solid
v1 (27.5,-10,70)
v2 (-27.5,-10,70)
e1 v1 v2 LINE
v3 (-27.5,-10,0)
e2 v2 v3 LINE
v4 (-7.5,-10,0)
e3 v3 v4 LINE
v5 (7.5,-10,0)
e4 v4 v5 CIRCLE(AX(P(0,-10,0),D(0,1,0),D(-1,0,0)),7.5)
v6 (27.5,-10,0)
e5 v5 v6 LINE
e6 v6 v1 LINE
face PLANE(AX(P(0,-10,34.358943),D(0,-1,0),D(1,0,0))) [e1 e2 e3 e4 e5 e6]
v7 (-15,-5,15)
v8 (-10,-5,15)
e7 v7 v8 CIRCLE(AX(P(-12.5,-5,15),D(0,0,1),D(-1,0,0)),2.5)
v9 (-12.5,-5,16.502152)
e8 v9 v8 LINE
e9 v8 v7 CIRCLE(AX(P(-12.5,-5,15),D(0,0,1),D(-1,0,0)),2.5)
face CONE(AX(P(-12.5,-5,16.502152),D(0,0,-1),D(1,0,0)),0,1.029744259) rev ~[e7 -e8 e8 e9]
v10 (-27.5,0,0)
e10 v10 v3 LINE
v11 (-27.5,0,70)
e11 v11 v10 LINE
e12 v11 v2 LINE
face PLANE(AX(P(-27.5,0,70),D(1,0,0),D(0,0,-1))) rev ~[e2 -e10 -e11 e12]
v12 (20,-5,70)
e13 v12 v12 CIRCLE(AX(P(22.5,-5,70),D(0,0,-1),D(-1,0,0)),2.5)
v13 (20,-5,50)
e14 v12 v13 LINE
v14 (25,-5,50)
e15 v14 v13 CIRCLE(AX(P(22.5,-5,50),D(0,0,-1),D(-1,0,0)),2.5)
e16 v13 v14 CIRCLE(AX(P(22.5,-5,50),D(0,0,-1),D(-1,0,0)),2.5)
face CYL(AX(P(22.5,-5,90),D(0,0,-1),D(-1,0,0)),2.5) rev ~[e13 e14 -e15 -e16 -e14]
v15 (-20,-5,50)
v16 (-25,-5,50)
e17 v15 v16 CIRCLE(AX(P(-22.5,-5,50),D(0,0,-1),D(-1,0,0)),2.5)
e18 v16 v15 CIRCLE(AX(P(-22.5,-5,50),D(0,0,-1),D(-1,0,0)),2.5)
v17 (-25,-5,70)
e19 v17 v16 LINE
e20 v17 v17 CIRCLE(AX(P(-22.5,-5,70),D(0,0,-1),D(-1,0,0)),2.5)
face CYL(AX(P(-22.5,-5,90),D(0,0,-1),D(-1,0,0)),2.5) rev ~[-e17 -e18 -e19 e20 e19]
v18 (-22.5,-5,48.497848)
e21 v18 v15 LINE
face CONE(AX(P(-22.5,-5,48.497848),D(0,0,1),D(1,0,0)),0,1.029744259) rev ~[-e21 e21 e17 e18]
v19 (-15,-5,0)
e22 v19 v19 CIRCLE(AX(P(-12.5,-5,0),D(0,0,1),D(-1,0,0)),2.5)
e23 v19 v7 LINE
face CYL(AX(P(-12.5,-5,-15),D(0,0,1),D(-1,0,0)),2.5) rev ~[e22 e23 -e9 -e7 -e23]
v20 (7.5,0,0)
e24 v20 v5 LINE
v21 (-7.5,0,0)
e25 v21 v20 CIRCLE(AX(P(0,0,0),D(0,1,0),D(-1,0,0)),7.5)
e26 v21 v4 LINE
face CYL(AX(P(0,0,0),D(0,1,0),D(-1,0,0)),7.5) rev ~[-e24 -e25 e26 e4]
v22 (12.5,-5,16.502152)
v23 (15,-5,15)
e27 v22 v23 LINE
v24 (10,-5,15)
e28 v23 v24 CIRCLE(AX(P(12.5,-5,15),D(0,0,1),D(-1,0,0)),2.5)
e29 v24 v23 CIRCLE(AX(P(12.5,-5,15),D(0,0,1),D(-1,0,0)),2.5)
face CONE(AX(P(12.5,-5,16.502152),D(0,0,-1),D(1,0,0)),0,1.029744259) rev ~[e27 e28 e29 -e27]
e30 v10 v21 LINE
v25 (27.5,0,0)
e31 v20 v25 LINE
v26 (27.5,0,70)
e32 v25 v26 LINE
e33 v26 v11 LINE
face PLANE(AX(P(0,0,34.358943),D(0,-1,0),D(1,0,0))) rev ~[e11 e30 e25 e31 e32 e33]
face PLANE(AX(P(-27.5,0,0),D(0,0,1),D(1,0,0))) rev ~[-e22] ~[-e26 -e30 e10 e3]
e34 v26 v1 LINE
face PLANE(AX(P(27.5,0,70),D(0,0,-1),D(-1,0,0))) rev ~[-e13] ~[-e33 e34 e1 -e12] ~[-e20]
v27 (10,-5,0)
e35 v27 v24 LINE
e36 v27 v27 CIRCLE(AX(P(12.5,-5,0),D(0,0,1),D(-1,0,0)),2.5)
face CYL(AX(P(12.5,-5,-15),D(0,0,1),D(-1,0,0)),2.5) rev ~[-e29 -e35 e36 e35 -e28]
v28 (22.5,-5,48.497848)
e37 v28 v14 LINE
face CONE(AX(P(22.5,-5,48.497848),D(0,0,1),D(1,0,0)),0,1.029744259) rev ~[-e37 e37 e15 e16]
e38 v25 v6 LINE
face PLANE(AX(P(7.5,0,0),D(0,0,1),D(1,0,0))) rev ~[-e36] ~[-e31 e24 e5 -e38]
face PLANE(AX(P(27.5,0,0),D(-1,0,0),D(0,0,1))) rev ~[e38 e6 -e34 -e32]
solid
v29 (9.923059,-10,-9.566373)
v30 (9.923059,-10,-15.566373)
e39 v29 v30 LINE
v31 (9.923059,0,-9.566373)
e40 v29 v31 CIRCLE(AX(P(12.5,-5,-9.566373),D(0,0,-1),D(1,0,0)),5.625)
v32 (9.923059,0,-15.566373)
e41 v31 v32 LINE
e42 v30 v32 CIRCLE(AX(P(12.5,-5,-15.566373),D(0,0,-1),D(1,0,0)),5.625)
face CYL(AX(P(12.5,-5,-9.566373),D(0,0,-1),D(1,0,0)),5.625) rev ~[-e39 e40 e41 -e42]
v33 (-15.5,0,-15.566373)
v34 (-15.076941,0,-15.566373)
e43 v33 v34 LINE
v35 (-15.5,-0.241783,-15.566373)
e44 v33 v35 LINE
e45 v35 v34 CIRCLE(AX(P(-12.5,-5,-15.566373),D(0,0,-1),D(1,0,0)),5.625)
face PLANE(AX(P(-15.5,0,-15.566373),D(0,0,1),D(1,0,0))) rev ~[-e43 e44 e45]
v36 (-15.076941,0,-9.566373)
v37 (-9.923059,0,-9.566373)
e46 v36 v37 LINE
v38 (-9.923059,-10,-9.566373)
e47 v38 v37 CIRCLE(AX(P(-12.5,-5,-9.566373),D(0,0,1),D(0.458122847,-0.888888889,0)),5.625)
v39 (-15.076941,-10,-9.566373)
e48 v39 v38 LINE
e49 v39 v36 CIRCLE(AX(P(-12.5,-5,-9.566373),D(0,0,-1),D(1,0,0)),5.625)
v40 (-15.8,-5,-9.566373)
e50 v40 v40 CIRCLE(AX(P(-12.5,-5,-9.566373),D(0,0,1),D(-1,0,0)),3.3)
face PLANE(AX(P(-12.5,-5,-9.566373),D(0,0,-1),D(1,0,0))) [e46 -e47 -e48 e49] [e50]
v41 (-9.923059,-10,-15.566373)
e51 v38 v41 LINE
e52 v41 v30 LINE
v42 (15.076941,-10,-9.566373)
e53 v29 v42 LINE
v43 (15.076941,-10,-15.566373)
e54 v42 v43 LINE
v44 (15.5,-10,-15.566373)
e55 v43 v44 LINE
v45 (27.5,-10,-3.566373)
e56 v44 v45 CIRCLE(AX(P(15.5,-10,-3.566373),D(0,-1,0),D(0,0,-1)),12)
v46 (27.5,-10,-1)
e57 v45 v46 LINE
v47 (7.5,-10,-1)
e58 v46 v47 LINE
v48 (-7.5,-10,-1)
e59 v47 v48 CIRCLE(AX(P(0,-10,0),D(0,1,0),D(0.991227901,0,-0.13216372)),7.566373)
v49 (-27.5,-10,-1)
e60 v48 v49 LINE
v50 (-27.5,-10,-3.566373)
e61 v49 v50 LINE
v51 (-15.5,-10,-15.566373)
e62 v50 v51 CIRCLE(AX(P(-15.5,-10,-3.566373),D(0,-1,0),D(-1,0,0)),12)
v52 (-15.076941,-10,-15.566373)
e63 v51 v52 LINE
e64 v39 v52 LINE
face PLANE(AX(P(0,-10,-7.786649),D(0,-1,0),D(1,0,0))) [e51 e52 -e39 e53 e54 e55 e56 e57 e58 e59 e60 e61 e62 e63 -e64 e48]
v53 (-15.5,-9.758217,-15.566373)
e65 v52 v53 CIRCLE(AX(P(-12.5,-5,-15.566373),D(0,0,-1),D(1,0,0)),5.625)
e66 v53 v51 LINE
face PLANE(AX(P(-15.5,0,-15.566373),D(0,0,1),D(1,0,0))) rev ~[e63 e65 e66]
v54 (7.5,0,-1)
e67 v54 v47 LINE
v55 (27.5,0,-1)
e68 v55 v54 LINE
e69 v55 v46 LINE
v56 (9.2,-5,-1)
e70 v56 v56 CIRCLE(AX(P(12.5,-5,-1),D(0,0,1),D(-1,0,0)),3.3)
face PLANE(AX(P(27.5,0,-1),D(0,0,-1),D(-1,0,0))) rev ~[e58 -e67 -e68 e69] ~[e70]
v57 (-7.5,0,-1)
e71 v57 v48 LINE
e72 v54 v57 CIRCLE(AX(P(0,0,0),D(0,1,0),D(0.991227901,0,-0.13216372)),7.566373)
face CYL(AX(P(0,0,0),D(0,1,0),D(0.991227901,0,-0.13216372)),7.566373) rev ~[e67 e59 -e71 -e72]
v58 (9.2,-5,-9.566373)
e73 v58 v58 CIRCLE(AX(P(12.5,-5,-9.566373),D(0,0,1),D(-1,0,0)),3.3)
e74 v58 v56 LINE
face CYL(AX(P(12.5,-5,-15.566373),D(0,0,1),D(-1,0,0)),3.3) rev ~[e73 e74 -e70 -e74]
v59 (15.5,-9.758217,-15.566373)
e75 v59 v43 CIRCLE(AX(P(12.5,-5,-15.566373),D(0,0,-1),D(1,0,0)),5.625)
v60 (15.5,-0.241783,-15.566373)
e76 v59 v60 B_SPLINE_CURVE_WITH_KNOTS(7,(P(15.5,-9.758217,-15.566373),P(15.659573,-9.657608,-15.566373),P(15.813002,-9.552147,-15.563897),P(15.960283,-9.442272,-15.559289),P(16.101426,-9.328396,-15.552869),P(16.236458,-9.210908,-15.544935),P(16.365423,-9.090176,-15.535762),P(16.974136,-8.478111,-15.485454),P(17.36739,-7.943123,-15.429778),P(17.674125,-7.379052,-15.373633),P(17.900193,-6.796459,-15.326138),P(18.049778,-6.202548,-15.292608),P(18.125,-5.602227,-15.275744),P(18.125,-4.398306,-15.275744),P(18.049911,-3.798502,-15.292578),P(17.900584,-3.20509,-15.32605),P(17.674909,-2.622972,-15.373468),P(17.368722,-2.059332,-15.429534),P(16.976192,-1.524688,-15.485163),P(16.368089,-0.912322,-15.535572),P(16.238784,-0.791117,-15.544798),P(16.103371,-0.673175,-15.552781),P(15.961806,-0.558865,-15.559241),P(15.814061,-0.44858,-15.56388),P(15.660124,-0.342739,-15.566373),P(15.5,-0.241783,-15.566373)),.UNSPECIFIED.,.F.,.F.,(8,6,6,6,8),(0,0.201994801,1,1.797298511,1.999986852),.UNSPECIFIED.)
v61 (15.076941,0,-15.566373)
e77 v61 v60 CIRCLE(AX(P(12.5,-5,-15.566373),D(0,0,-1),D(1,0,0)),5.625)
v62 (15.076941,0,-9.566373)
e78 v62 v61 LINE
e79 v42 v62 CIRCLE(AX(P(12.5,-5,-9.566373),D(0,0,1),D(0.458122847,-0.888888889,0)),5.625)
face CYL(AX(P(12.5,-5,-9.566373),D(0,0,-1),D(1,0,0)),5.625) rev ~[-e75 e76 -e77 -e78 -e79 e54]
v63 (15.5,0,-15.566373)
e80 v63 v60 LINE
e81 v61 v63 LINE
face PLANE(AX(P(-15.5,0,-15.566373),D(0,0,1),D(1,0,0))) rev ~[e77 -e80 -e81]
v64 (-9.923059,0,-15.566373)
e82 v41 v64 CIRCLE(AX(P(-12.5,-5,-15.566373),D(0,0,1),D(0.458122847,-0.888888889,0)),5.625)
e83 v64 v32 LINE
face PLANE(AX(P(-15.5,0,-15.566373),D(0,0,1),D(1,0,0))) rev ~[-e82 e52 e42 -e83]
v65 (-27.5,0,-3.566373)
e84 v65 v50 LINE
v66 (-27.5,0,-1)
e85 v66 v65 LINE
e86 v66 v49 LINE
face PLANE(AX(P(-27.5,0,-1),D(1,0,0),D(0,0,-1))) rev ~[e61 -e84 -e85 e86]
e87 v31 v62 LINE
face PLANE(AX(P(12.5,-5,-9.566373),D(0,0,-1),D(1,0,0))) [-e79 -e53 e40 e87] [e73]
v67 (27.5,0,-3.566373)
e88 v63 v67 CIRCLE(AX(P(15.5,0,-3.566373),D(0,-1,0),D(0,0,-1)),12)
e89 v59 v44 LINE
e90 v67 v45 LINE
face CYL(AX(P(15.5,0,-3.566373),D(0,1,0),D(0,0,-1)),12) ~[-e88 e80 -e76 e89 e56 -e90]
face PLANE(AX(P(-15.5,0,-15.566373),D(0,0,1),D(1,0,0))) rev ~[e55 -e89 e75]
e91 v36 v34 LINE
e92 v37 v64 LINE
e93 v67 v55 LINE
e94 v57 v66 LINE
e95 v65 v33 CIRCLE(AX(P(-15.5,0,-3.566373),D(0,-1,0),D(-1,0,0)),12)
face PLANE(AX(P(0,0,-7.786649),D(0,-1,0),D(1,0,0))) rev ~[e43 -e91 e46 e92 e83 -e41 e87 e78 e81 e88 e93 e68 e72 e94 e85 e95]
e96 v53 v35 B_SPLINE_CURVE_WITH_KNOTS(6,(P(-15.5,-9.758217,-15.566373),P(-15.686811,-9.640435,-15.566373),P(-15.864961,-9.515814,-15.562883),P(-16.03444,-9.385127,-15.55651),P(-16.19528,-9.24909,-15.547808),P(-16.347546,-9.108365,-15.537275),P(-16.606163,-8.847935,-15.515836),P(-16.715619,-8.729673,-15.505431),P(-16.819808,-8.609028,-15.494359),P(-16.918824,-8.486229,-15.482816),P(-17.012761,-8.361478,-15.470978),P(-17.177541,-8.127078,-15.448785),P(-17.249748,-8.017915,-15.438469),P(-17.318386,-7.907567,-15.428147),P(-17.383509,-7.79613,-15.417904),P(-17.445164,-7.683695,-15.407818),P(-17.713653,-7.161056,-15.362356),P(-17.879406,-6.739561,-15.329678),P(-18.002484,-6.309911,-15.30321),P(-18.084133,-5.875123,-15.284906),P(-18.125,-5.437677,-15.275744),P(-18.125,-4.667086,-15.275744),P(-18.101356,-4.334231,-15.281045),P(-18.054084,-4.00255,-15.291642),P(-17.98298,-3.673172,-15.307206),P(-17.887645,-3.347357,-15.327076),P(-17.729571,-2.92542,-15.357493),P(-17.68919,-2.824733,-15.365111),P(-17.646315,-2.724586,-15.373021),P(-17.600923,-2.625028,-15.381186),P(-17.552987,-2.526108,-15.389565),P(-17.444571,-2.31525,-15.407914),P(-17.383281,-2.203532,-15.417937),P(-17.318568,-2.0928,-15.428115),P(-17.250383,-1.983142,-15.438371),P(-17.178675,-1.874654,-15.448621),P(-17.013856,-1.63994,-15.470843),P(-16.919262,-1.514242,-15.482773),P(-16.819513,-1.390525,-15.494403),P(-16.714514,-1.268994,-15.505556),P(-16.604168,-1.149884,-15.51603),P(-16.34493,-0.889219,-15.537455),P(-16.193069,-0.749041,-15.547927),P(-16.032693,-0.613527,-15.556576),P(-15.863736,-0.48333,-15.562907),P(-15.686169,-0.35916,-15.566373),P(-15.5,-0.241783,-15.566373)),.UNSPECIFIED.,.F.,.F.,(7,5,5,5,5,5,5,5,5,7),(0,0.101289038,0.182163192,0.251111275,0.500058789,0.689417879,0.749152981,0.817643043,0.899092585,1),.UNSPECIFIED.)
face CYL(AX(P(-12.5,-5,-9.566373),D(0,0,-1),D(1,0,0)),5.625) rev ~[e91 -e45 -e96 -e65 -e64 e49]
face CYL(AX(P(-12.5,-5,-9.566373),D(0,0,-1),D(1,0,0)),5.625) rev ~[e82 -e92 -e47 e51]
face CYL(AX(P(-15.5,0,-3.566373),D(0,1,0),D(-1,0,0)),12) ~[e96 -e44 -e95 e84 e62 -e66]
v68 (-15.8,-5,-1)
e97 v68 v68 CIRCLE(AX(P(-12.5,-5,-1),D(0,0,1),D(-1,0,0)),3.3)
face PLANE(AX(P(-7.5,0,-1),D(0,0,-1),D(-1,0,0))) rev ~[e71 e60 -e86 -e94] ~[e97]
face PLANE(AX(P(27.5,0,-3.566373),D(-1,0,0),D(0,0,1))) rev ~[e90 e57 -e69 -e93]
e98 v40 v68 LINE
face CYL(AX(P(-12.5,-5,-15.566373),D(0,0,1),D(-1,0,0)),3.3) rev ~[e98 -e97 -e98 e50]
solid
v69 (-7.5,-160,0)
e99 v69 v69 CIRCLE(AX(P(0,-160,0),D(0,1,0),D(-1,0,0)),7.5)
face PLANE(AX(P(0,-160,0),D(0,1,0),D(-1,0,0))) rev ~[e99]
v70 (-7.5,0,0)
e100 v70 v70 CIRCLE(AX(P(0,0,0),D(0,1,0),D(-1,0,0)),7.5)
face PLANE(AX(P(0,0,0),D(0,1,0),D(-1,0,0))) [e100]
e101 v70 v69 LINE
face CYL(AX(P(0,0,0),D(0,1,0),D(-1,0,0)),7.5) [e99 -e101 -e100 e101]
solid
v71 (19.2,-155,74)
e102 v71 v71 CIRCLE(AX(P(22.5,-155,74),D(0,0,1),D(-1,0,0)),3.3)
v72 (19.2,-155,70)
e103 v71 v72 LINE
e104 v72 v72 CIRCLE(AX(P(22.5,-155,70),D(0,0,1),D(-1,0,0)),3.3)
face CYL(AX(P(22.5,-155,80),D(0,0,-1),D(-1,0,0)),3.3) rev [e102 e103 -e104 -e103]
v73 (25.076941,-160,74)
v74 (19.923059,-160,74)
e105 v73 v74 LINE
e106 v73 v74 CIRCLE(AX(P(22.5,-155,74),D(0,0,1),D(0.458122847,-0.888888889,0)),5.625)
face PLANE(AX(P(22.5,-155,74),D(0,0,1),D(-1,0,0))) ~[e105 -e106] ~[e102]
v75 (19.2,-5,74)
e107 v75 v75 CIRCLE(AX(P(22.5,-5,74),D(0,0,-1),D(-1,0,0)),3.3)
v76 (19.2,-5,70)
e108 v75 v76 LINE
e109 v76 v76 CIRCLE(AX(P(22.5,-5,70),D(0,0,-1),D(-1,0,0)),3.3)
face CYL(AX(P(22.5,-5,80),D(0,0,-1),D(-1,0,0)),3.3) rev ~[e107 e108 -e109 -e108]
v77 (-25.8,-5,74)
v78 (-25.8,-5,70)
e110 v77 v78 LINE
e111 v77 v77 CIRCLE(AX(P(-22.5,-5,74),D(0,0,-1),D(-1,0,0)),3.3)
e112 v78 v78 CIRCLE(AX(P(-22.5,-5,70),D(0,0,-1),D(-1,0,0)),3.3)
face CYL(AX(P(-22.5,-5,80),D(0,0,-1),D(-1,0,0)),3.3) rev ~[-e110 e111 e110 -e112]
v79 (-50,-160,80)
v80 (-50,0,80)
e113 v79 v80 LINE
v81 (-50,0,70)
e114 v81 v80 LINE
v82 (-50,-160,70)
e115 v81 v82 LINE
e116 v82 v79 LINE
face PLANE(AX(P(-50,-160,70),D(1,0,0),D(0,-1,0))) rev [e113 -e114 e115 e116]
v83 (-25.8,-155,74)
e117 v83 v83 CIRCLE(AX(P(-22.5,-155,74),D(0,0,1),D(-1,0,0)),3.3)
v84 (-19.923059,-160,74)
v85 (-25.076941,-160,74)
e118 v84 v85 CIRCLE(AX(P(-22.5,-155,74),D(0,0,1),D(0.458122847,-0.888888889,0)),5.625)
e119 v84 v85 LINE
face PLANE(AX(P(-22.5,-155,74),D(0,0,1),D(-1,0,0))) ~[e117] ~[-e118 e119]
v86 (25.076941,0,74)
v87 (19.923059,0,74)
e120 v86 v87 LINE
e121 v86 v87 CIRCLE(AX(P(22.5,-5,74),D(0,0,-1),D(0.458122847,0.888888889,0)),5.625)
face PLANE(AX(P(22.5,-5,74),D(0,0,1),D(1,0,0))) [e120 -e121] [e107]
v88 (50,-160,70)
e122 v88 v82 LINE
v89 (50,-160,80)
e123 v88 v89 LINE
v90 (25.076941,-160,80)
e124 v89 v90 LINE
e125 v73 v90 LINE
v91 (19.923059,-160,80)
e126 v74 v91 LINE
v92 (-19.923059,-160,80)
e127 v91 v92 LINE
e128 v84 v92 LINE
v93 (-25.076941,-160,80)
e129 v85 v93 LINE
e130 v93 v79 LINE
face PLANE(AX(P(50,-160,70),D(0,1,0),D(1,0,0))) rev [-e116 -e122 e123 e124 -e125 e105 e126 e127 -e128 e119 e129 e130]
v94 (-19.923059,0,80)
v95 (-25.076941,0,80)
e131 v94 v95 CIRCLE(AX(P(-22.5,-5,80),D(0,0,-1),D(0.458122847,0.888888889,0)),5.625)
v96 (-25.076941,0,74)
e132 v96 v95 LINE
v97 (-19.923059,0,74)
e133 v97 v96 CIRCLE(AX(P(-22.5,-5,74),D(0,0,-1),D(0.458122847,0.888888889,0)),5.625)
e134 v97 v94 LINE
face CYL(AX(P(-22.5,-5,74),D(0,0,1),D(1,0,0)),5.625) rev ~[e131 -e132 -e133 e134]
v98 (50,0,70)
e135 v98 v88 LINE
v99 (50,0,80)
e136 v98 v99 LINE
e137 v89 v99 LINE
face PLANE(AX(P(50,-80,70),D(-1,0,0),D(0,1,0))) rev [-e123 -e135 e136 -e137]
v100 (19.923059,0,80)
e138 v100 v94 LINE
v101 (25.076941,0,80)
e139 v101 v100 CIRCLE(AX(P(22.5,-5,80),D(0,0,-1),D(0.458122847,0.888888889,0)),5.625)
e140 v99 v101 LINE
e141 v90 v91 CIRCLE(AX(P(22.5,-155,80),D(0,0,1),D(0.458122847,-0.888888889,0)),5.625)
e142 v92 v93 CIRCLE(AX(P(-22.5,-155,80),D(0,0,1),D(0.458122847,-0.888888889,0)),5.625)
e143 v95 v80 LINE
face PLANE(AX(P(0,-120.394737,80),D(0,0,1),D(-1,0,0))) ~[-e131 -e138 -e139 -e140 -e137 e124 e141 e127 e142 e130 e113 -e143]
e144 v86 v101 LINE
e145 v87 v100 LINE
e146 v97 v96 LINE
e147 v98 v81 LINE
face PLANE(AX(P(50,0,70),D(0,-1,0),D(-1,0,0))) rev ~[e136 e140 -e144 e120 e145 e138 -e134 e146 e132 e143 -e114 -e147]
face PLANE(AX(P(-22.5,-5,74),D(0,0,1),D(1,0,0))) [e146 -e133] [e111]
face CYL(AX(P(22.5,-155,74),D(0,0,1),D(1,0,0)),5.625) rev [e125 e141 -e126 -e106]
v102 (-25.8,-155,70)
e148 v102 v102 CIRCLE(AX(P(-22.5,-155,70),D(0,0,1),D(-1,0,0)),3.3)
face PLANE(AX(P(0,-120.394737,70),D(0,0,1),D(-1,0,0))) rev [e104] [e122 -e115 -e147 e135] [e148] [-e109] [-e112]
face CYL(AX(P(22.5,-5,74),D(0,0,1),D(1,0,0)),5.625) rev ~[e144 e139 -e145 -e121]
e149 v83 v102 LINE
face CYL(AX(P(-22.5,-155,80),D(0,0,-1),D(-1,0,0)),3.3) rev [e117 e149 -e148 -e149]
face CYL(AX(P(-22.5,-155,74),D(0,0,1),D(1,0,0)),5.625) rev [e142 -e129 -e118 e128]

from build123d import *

# Parameters (mm, degrees)
F1_DEPTH        = 10
F3_D            = 5
F3_DEPTH        = 20
F3_TIP          = 1.5021515476
F4_W            = 55
F4_H            = 10
F4_R            = 2.5
F5_DEPTH        = 10
F7_D            = 6.6
F7_DEPTH        = 20
F7_CBORE_D      = 11.25
F7_CBORE_DEPTH  = 6
F7_TIP          = 1.9828400428
F10_D           = 5
F10_DEPTH       = 15
F10_TIP         = 1.5021515476
F12_D           = 6.6
F12_DEPTH       = 20
F12_CBORE_D     = 11.25
F12_CBORE_DEPTH = 6
F12_TIP         = 1.9828400428
F14_DEPTH       = 160


with BuildPart() as f1:
    # F0 (on Front) → F1 (new body)
    with BuildSketch(Plane.XZ):
        with BuildLine():
            Line((27.5, 70), (-27.5, 70))
            Line((-27.5, 70), (-27.5, 0))
            Line((-27.5, 0), (-7.5, 0))
            ThreePointArc((-7.5, 0), (0, 7.5), (7.5, 0))
            Line((7.5, 0), (27.5, 0))
            Line((27.5, 0), (27.5, 70))
        make_face()
    extrude(amount=F1_DEPTH)

    # F3
    with Locations(Plane.XY.offset(70)):
        with Locations((-22.5, -5), (22.5, -5)):
            Hole(F3_D / 2, depth=F3_DEPTH)
            with Locations((0, 0, -(F3_DEPTH + F3_TIP / 2))):  # 118° drill point
                Cone(0, F3_D / 2, F3_TIP, mode=Mode.SUBTRACT)

    # F10
    with Locations(Plane(origin=(0, 0, 0), x_dir=(1, 0, 0), z_dir=(0, 0, -1))):
        with Locations((-12.5, 5), (12.5, 5)):
            Hole(F10_D / 2, depth=F10_DEPTH)
            with Locations((0, 0, -(F10_DEPTH + F10_TIP / 2))):  # 118° drill point
                Cone(0, F10_D / 2, F10_TIP, mode=Mode.SUBTRACT)


with BuildPart() as f1b:
    # F0 (on Front) → F1, piece 2 (new body)
    with BuildSketch(Plane.XZ):
        with BuildLine():
            Line((27.5, -3.5663729752), (27.5, -1))
            Line((27.5, -1), (7.5, -1))
            ThreePointArc((7.5, -1), (0, -7.5663729752), (-7.5, -1))
            Line((-7.5, -1), (-27.5, -1))
            Line((-27.5, -1), (-27.5, -3.5663729752))
            ThreePointArc((-27.5, -3.5663729752), (-23.9852813742, -12.0516543494), (-15.5, -15.5663729752))
            Line((-15.5, -15.5663729752), (15.5, -15.5663729752))
            ThreePointArc((15.5, -15.5663729752), (23.9852813742, -12.0516543494), (27.5, -3.5663729752))
        make_face()
    extrude(amount=F1_DEPTH)

    # F12
    with Locations(Plane(origin=(0, 0, -15.5663729752), x_dir=(1, 0, 0), z_dir=(0, 0, -1))):
        with Locations((-12.5, 5), (12.5, 5)):
            CounterBoreHole(F12_D / 2, F12_CBORE_D / 2, F12_CBORE_DEPTH, depth=F12_DEPTH)
            with Locations((0, 0, -(F12_DEPTH + F12_TIP / 2))):  # 118° drill point
                Cone(0, F12_D / 2, F12_TIP, mode=Mode.SUBTRACT)


with BuildPart() as f5:
    # F4 (on face) → F5 (new body)
    with BuildSketch(Plane.XY.offset(70)):
        Polygon((-27.5, 0), (-50, 0), (-50, -80), (50, -80), (50, 0), (27.5, 0), (27.5, -10), (-27.5, -10), align=None)
        with Locations((0, -5)):
            Rectangle(F4_W, F4_H)
        with Locations((-22.5, -5)):
            Circle(F4_R, mode=Mode.SUBTRACT)
        with Locations((22.5, -5)):
            Circle(F4_R, mode=Mode.SUBTRACT)
    extrude(amount=F5_DEPTH)

    # F7
    with Locations(Plane.XY.offset(80)):
        with Locations((-22.5, -5), (22.5, -5)):
            CounterBoreHole(F7_D / 2, F7_CBORE_D / 2, F7_CBORE_DEPTH, depth=F7_DEPTH)
            with Locations((0, 0, -(F7_DEPTH + F7_TIP / 2))):  # 118° drill point
                Cone(0, F7_D / 2, F7_TIP, mode=Mode.SUBTRACT)

    # F8: F5 across face


with BuildPart() as f5_1:
    add(f5.part)
    add(f5.part.mirror(Plane(origin=(0, -80, 75), x_dir=(1, 0, 0), z_dir=(0, -1, 0))))


with BuildPart() as f14:
    # F13 (on face) → F14 (new body, through all)
    with BuildSketch(Plane(origin=(0, 0, 0), x_dir=(-1, 0, 0), z_dir=(0, 1, 0))):
        with BuildLine():
            ThreePointArc((-7.5, 0), (0, -7.5), (7.5, 0))
            ThreePointArc((7.5, 0), (0, 7.5), (-7.5, 0))
        make_face()
    extrude(amount=-F14_DEPTH)


solid = Compound([f1.part, f1b.part, f5_1.part, f14.part])
